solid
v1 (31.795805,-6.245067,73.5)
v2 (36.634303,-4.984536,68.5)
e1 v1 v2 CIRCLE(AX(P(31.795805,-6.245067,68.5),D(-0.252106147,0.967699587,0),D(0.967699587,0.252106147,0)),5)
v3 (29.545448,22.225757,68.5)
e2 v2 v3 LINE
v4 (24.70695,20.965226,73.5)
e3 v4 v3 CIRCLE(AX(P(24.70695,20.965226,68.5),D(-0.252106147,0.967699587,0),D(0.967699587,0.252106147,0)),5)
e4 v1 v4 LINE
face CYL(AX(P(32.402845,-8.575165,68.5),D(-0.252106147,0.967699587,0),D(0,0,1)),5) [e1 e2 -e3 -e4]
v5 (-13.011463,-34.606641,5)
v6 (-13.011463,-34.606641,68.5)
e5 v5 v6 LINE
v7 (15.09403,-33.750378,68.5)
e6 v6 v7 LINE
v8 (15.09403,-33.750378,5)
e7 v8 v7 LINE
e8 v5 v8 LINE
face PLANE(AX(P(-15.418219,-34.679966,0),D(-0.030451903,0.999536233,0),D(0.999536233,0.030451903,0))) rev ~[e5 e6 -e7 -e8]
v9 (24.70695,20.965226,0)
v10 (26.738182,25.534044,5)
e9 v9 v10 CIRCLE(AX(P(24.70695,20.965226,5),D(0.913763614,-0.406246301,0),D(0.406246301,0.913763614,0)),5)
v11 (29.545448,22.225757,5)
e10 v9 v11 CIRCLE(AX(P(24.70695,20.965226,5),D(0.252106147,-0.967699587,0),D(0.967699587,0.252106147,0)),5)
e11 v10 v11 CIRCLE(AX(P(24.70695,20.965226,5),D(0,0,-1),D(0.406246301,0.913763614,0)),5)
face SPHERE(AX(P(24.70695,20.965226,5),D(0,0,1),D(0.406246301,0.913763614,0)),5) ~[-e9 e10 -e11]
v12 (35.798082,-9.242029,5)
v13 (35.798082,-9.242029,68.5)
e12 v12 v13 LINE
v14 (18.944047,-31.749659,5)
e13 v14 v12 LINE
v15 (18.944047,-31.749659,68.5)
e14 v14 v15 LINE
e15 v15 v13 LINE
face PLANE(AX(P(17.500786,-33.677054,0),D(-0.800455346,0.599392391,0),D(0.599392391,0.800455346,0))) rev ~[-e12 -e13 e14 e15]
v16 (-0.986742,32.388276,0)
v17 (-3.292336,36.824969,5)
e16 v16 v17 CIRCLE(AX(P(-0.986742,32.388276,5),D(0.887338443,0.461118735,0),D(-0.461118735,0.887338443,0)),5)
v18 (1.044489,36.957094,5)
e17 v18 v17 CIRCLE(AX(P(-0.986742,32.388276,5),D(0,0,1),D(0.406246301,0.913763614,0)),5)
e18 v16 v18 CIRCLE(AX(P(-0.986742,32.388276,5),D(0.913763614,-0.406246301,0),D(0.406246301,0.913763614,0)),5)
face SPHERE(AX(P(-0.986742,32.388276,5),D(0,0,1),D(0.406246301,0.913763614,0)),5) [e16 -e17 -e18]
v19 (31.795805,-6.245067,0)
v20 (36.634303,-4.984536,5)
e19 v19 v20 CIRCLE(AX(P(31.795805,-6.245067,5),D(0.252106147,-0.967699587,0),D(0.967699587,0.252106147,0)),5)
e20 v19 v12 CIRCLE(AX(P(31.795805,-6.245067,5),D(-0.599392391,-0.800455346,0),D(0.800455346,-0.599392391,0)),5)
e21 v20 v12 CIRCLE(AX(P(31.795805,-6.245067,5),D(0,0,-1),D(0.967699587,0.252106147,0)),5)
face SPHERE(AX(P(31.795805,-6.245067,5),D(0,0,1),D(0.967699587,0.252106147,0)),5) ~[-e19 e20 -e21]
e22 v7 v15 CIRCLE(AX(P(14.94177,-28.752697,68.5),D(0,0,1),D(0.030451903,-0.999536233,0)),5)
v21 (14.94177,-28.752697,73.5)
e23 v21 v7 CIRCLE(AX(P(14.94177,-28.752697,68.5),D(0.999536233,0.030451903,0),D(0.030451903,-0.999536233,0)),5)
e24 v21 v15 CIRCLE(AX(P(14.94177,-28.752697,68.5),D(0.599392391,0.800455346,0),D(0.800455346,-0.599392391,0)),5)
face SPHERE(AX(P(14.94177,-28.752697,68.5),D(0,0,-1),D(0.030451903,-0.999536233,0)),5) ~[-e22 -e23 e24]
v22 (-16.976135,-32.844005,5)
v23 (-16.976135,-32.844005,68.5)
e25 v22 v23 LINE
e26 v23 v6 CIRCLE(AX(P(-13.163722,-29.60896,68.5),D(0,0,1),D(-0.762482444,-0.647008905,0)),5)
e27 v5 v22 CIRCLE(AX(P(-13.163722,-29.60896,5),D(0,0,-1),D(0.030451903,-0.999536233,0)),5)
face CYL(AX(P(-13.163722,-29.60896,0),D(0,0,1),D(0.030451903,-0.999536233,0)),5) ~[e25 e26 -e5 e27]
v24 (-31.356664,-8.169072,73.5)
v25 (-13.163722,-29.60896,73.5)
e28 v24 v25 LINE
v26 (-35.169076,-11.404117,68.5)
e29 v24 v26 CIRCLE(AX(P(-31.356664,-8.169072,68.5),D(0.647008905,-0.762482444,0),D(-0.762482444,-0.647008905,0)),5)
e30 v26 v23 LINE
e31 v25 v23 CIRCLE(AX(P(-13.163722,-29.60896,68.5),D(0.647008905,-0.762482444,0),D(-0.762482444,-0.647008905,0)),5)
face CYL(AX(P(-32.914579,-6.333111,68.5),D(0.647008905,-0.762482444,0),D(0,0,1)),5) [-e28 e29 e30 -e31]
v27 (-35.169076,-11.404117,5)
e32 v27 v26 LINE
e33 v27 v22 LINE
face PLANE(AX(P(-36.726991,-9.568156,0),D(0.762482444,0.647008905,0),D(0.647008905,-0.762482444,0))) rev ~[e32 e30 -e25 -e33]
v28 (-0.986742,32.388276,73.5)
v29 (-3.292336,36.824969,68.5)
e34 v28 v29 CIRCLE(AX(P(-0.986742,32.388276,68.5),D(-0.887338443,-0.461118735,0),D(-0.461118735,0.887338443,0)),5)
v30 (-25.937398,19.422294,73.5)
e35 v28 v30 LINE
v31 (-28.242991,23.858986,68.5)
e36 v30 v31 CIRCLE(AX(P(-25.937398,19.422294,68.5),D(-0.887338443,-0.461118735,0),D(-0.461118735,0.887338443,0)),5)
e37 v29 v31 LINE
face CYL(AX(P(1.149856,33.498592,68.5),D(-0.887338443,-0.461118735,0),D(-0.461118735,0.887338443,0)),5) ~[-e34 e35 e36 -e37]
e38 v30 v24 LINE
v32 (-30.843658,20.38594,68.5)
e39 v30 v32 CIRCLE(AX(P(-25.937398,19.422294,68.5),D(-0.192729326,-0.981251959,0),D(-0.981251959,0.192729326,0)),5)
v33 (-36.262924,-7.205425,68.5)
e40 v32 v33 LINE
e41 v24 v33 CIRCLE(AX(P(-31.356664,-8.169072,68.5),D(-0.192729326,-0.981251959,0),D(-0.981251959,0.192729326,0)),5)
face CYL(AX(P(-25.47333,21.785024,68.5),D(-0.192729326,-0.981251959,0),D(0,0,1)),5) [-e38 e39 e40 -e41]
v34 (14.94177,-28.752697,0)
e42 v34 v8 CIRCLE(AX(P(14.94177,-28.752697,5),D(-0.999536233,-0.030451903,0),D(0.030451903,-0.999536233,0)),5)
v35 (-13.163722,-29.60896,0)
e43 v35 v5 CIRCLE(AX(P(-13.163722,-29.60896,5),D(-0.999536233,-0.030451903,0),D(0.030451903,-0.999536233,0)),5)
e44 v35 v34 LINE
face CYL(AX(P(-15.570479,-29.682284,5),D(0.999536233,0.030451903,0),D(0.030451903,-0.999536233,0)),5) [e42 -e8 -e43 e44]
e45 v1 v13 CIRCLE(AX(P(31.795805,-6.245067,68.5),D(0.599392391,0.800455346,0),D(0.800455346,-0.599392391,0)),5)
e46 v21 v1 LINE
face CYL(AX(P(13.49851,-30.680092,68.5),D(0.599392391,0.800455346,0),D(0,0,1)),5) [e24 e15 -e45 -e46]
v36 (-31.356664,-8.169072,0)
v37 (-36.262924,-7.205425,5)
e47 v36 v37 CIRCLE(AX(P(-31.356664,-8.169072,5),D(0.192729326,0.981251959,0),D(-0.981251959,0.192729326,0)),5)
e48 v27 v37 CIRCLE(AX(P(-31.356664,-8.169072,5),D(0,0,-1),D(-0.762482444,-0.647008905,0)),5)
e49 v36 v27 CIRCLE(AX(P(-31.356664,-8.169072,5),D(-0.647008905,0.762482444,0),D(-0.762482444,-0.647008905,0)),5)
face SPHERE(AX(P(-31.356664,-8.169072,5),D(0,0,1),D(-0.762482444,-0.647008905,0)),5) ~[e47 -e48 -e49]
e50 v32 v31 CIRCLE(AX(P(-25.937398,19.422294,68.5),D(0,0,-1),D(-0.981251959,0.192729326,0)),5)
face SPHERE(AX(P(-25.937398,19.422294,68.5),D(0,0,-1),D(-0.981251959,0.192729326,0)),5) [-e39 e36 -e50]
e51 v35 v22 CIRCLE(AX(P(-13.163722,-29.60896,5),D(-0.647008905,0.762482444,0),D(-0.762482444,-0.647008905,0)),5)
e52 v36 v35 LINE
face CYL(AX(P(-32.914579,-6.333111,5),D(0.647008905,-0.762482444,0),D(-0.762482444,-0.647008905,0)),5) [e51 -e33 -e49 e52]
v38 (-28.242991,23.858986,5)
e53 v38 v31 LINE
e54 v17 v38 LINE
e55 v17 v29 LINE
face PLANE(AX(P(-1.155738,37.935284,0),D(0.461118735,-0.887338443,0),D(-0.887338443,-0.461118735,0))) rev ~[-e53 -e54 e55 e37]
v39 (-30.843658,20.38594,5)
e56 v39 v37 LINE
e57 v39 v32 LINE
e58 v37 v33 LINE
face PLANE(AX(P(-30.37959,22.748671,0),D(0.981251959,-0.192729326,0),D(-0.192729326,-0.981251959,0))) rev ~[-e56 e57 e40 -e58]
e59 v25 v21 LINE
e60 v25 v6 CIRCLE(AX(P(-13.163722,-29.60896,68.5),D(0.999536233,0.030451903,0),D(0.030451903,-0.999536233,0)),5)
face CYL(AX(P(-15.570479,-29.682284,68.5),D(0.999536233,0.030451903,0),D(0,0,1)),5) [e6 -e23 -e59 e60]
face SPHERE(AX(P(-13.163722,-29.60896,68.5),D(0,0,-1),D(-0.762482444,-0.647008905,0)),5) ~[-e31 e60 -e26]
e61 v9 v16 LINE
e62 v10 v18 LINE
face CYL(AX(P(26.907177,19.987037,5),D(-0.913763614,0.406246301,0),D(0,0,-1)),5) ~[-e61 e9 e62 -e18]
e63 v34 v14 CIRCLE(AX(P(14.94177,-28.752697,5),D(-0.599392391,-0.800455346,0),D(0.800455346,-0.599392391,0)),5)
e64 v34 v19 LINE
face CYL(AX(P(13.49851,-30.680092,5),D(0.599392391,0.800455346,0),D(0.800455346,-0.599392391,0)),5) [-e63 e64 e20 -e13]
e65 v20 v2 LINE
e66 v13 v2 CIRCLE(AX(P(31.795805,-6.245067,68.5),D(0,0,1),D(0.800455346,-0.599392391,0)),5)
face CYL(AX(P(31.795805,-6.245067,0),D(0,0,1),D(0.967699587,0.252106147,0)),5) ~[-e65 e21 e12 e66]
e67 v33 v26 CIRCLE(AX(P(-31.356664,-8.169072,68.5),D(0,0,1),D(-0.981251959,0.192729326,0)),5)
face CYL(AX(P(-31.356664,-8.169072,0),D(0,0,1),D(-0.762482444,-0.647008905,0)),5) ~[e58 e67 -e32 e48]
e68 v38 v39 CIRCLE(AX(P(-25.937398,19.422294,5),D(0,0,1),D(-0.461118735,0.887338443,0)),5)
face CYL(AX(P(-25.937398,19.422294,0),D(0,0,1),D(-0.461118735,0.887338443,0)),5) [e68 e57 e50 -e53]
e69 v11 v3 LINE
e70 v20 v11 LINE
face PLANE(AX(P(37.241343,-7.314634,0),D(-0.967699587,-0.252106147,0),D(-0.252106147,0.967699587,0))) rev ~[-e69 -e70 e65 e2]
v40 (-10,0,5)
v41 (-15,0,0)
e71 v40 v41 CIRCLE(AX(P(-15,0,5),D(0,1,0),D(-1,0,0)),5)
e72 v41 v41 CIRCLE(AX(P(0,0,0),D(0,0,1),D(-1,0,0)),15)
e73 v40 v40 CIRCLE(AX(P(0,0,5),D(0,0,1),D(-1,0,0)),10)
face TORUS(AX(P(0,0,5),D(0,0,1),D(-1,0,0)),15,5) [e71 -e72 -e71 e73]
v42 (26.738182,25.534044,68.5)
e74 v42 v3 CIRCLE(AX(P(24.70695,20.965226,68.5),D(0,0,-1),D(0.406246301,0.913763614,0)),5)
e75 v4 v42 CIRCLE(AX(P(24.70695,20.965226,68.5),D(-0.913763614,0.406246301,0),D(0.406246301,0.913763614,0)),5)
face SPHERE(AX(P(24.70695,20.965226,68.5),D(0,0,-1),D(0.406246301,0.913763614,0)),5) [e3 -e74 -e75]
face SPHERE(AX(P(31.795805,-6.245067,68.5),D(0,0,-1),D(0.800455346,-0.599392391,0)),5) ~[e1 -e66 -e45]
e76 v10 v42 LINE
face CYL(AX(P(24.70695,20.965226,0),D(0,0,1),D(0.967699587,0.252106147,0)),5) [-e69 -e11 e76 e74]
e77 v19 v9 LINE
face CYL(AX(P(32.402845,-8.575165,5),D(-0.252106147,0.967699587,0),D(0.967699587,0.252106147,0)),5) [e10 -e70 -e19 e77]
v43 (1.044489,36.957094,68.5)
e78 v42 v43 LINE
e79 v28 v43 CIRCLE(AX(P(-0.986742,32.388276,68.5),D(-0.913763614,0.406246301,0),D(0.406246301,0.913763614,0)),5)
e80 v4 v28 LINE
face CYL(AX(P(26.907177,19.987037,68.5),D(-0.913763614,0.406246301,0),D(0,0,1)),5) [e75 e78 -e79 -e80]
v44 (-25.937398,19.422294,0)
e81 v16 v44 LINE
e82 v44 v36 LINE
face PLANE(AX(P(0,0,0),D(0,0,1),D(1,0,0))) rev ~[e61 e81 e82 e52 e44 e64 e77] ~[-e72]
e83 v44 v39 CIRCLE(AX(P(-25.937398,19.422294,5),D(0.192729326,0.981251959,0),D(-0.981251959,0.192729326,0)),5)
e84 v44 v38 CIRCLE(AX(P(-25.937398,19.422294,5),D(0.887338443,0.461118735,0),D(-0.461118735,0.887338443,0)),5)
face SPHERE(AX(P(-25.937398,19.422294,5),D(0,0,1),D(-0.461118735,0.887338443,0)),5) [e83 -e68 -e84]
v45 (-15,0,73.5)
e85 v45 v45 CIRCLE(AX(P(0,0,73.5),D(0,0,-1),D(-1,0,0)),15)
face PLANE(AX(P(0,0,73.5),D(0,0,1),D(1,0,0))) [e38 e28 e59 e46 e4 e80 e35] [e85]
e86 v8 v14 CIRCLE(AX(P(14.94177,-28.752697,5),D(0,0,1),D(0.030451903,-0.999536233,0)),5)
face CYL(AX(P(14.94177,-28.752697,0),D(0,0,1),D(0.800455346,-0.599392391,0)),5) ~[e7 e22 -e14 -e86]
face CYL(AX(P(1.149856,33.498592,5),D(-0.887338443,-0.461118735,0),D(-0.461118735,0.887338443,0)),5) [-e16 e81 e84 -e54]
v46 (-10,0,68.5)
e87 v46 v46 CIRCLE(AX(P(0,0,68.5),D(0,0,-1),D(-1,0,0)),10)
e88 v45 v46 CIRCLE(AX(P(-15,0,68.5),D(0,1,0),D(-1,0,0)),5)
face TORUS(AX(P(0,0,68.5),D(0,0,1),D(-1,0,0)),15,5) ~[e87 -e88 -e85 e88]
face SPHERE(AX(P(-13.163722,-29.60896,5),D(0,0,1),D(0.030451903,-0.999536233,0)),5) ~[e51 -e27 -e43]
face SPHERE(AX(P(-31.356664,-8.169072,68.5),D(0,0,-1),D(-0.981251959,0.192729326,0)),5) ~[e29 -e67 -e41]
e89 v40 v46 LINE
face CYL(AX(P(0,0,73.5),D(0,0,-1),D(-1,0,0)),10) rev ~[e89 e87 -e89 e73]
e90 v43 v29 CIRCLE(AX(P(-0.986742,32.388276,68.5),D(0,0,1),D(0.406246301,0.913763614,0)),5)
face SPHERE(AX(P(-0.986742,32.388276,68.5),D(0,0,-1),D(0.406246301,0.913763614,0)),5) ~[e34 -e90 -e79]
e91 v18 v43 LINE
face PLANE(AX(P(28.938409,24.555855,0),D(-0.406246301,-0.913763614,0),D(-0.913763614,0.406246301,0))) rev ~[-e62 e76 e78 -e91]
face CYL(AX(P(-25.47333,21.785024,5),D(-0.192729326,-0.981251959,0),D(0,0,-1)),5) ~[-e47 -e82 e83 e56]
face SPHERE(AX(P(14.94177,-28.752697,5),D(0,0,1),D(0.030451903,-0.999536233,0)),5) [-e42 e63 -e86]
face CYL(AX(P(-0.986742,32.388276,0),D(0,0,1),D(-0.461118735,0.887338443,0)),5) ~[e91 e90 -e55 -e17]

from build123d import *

# Parameters (mm, degrees)
F1_DEPTH       = 73.5
F3_D           = 20
F3_CBORE_D     = 20
F3_CBORE_DEPTH = 20
F4_R           = 5


# Not quite as in the source:
# - two fillets or chamfers of one size are made in one step


with BuildPart() as f1:
    # F0 (on Top) → F1 (new body)
    with BuildSketch(Plane.XY):
        Polygon((-1.1557375875, 37.9352838977), (-30.379589847, 22.7486706094), (-36.726991321, -9.568155636), (-15.4182192362, -34.6799655328), (17.5007864078, -33.6770540409), (37.2413429358, -7.3146339696), (28.9384086481, 24.5558546722), align=None)
    extrude(amount=F1_DEPTH)

    # F3 (through all)
    with Locations(Plane.XY.offset(73.5)):
        with Locations((0, 0)):
            CounterBoreHole(F3_D / 2, F3_CBORE_D / 2, F3_CBORE_DEPTH)

    # F4
    f4_edges = [f1.edges().sort_by_distance(p)[0] for p in [
        (-26.072605, -22.124061, 0),
        (-33.553291, 6.590257, 0),
        (-36.726991, -9.568156, 36.75),
        (-15.418219, -34.679966, 36.75),
        (-33.553291, 6.590257, 73.5),
        (-26.072605, -22.124061, 73.5),
        (-15.767664, 30.341977, 73.5),
        (-30.37959, 22.748671, 36.75),
        (-1.155738, 37.935284, 36.75),
        (28.938409, 24.555855, 36.75),
        (13.891336, 31.245569, 73.5),
        (33.089876, 8.62061, 73.5),
        (13.891336, 31.245569, 0),
        (33.089876, 8.62061, 0),
        (1.041284, -34.17851, 0),
        (27.371065, -20.495844, 0),
        (17.500786, -33.677054, 36.75),
        (37.241343, -7.314634, 36.75),
        (1.041284, -34.17851, 73.5),
        (27.371065, -20.495844, 73.5),
        (-15.767664, 30.341977, 0),
        (-10, 0, 0),
        (-10, 0, 73.5),
    ]]
    fillet(f4_edges, radius=F4_R)


solid = f1.part
